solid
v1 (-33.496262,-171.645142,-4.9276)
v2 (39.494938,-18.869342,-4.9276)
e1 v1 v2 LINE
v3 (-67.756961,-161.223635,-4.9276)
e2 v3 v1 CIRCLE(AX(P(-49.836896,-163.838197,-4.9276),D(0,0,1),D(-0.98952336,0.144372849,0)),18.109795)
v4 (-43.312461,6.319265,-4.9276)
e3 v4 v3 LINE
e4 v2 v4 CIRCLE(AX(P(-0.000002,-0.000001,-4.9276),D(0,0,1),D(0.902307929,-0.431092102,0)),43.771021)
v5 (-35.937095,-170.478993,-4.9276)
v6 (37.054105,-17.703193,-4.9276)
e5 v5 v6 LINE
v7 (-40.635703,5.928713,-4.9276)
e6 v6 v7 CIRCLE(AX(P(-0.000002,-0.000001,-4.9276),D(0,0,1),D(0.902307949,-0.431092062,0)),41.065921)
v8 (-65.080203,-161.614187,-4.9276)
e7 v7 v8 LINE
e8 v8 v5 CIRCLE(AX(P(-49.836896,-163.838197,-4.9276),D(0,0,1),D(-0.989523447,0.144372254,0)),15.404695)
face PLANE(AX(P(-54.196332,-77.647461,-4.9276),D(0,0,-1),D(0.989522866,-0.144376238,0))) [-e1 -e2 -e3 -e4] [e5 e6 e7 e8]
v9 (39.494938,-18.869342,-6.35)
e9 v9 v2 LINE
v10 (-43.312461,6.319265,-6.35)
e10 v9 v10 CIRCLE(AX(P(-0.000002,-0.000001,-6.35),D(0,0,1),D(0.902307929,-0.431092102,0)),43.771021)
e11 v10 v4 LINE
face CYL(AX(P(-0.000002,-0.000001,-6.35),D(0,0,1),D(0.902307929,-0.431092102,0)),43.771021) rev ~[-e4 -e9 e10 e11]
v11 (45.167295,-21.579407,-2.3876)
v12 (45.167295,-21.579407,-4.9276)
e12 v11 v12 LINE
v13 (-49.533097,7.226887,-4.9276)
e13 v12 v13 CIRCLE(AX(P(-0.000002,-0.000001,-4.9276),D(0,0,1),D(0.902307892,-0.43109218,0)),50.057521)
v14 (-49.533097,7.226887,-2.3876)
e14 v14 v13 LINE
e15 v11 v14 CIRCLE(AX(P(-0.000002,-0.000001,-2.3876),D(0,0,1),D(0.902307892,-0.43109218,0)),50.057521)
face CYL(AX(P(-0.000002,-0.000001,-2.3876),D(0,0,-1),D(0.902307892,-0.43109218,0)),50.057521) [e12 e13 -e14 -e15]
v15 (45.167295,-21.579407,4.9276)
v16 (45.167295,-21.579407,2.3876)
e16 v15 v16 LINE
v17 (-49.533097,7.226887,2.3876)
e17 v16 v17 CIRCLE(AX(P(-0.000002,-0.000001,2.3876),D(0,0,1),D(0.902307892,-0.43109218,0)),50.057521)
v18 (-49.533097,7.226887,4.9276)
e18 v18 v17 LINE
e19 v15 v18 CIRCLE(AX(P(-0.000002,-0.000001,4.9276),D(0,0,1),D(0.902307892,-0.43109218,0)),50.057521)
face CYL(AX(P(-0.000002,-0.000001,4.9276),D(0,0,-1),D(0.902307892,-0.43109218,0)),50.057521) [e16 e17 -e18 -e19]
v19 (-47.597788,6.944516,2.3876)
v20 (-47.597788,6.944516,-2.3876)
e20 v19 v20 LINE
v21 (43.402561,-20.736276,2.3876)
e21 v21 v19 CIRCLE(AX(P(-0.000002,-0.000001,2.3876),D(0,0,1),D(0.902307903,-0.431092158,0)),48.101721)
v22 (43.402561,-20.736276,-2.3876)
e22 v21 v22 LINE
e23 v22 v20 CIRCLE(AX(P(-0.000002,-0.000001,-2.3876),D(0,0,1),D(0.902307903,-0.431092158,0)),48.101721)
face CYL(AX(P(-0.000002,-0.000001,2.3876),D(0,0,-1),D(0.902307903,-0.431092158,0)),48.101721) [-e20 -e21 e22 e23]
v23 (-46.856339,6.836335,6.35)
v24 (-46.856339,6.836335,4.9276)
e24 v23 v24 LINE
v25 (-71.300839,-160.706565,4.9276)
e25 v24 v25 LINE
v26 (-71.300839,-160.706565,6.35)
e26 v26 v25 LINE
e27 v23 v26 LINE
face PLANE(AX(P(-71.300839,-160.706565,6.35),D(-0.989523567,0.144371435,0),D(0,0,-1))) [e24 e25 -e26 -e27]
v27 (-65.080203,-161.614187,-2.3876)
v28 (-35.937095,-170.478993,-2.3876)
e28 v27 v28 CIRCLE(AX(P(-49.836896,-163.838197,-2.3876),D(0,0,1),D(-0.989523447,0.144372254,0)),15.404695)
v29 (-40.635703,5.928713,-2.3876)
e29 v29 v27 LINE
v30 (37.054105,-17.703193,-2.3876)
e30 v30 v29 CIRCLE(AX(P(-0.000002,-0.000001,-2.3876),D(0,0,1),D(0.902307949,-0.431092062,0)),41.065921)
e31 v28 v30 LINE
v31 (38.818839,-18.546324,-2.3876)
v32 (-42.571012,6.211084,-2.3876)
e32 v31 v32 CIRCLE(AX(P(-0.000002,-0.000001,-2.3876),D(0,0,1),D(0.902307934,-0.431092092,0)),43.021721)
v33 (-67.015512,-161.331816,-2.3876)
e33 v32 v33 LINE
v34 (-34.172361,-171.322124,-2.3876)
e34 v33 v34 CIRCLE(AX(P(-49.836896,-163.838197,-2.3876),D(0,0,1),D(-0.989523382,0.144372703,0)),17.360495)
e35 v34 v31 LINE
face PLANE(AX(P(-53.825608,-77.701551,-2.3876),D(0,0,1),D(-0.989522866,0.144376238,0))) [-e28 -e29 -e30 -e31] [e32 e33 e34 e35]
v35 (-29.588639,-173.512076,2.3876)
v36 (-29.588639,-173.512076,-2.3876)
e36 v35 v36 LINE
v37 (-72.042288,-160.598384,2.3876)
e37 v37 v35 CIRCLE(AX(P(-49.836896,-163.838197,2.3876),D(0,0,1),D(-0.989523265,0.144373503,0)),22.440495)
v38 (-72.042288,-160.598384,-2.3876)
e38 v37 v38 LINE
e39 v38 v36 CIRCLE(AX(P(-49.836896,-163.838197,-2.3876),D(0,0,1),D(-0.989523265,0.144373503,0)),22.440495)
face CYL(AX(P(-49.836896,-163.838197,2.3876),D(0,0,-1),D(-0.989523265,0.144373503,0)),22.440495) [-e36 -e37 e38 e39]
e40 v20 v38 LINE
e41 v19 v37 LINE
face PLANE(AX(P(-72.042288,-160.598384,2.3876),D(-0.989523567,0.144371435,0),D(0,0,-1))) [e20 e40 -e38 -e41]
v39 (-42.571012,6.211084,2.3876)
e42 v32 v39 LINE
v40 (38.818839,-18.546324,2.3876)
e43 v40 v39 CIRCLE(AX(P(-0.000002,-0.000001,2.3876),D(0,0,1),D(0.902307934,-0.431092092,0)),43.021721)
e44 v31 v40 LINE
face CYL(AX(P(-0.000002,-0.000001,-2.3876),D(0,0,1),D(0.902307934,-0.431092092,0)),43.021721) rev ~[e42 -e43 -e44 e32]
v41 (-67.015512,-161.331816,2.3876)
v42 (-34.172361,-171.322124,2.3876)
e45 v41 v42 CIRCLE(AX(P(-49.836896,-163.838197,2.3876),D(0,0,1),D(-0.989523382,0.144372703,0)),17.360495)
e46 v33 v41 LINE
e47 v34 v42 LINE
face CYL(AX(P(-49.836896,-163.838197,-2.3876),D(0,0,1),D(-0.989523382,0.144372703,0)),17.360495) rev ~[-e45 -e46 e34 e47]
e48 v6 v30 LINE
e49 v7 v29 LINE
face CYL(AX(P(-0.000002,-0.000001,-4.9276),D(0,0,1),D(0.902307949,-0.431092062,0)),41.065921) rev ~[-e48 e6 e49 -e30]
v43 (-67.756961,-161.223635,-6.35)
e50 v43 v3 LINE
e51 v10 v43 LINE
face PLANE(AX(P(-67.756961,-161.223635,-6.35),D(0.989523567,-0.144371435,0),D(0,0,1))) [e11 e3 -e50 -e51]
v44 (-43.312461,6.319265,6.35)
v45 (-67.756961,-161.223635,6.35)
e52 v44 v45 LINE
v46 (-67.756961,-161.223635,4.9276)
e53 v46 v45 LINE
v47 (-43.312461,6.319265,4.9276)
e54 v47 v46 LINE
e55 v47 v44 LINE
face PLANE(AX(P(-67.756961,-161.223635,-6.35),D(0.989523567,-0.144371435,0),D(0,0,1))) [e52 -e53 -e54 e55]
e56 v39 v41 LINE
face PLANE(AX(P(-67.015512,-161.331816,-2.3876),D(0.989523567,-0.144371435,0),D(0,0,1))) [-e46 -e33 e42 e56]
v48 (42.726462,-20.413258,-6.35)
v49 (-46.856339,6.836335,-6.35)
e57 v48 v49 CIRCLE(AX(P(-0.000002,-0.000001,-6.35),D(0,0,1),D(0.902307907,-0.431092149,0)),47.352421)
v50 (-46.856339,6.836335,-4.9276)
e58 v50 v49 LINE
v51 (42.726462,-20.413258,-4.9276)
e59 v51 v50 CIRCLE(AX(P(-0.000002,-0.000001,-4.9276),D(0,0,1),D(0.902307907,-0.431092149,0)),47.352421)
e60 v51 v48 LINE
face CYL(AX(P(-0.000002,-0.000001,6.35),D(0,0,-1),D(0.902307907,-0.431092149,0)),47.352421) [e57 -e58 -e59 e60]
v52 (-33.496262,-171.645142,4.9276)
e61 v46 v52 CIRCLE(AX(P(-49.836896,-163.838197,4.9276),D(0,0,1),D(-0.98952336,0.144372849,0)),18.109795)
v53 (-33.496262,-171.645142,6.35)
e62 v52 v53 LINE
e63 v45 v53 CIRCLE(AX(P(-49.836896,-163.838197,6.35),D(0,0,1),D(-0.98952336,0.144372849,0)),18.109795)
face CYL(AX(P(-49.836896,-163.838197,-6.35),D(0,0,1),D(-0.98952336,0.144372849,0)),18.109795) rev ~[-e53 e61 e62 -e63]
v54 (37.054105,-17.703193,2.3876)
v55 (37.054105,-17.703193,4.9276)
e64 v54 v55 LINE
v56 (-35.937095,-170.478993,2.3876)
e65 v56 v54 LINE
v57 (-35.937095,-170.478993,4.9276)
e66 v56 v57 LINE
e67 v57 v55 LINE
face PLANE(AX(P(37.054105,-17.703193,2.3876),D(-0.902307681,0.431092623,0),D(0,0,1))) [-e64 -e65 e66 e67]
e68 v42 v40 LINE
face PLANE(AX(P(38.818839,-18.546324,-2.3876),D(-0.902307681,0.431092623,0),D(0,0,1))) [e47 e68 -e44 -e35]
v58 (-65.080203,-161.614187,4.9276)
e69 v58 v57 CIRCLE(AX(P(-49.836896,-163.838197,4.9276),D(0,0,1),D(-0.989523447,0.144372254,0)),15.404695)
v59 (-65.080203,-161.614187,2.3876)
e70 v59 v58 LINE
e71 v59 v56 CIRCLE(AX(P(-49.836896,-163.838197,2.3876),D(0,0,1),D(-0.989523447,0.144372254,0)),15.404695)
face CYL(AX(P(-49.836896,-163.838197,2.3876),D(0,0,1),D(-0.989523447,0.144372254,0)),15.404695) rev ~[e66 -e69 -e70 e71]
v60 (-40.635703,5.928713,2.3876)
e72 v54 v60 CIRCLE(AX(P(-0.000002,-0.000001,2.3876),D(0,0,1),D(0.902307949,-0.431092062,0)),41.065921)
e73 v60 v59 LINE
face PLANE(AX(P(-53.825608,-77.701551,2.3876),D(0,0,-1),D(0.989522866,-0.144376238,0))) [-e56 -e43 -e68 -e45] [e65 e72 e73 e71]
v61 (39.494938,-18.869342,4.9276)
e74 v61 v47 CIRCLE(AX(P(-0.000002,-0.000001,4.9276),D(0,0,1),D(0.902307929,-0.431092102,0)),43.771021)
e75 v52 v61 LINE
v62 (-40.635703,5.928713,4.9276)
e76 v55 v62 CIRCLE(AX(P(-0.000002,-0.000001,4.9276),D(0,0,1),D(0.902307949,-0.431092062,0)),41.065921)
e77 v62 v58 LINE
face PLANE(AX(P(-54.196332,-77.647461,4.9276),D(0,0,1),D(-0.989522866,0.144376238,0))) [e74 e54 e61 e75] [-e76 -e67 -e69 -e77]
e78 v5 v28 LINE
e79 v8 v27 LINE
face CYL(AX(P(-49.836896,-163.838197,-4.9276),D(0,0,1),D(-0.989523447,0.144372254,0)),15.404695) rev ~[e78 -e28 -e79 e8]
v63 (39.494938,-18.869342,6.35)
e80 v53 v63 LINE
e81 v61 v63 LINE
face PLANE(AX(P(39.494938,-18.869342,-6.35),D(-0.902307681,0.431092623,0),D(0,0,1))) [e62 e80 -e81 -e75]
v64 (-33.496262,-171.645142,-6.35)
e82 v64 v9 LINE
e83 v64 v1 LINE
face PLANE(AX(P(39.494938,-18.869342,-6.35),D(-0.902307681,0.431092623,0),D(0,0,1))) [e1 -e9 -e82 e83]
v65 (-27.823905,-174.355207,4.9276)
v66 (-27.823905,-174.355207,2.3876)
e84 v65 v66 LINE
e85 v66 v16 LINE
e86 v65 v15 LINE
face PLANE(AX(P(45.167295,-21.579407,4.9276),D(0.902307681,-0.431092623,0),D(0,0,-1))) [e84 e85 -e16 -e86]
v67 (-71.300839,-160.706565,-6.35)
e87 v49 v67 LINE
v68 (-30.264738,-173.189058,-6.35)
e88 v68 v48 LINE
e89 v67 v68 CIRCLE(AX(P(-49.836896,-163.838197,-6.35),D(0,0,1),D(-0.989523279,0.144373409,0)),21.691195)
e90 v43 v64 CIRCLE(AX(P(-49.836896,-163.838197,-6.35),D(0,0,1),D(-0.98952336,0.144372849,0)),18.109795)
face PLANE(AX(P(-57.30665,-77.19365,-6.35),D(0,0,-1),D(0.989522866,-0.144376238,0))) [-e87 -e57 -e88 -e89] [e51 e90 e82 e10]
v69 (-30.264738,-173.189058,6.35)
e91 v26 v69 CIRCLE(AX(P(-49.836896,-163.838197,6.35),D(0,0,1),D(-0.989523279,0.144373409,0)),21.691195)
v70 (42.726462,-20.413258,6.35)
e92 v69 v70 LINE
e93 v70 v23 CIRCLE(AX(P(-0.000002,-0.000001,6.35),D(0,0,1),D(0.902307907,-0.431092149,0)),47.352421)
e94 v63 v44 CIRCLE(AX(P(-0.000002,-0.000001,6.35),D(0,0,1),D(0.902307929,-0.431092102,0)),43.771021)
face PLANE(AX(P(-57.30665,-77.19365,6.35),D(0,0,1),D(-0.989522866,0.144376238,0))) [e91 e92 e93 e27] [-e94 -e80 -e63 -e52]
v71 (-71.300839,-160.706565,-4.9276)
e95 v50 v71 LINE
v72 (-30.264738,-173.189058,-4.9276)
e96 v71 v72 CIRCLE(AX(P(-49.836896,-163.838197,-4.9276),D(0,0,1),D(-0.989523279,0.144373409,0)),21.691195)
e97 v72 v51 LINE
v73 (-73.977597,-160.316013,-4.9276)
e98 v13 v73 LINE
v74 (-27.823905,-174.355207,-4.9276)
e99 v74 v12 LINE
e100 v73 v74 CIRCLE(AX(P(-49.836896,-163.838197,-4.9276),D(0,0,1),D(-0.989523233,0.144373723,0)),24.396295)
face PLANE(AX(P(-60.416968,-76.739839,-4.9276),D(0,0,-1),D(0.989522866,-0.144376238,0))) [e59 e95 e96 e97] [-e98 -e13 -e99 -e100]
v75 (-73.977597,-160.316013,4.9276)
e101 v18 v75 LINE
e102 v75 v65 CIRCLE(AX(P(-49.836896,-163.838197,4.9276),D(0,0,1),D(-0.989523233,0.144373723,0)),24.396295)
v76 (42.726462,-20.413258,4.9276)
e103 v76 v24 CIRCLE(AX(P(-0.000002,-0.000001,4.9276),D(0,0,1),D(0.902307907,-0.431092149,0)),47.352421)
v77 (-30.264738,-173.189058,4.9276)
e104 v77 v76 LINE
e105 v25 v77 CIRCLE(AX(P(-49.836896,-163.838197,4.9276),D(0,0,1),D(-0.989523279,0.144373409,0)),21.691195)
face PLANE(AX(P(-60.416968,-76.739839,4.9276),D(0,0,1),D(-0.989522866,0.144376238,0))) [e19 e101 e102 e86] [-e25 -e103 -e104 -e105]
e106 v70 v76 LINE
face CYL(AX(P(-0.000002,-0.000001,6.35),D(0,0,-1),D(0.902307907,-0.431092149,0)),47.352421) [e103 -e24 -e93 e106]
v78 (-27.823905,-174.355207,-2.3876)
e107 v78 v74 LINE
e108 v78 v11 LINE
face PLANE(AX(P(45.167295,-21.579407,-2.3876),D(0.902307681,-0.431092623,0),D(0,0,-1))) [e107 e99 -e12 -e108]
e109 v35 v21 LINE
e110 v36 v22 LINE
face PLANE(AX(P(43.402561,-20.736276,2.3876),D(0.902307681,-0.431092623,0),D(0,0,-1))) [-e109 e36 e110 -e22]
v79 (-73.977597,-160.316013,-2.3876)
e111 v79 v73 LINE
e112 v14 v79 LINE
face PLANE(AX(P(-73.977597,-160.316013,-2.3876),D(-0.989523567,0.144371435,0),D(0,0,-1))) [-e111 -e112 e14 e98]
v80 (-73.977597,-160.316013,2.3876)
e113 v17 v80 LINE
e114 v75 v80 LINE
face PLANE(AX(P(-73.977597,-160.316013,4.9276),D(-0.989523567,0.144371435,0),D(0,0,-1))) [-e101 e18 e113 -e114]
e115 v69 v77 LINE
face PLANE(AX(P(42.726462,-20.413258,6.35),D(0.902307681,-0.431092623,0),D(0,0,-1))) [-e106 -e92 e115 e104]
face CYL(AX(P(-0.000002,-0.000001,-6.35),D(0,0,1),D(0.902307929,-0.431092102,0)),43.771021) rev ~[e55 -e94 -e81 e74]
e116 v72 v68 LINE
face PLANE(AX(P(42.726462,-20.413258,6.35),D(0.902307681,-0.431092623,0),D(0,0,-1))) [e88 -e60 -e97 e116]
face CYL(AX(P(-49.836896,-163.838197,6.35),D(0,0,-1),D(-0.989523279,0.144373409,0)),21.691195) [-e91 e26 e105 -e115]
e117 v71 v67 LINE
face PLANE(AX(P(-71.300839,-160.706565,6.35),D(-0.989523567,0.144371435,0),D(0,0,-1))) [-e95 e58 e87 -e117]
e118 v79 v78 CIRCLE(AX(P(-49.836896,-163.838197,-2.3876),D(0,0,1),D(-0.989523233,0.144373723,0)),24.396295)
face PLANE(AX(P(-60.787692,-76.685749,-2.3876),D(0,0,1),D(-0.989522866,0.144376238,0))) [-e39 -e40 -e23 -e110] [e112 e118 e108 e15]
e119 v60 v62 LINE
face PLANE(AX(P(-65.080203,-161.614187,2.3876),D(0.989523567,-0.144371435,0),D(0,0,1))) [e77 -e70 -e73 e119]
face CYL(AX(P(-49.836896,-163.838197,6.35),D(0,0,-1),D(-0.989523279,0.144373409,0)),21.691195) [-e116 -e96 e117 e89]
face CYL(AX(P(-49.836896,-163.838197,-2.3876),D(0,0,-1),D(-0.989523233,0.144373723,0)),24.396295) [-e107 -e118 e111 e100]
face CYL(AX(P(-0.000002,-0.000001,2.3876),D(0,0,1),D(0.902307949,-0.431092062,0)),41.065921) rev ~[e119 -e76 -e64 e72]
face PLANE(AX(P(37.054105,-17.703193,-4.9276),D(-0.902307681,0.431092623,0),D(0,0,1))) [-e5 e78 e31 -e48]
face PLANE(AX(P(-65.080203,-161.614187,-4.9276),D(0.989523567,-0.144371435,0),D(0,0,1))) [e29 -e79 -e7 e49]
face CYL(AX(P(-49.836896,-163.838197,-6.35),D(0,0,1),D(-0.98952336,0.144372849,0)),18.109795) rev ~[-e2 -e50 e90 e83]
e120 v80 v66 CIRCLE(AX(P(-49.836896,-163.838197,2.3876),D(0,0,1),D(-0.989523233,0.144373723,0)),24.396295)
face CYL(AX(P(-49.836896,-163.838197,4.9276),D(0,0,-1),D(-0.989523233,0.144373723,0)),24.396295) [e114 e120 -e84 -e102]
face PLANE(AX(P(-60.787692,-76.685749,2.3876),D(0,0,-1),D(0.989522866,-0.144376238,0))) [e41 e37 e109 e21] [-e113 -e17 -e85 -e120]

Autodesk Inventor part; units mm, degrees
ref_plane "Work Plane2" through (-49.8369, -163.8382, 0) normal (-1, 0, 0) x (0, 0, 1)
ref_plane "Work Plane3" through (0, 0, 0) normal (-0.1802136, -0.9836275, 0) x (0, 0, 1)
sketch "Path" plane through (0, 0, 0) normal (0, 0, 1) x (1, 0, 0)
  arc A0 (-69.5289, -160.9651) -> (-31.8805, -172.4171) centre (-49.8369, -163.8382) ccw
  arc A1 (41.1107, -19.6413) -> (-45.0844, 6.5778) centre (0, 0) ccw
  line L0 (41.1107, -19.6413) -> (-31.8805, -172.4171)
  line L1 (-69.5289, -160.9651) -> (-45.0844, 6.5778)
  dimension "d31" = 8.9916
ref_plane "Section Plane" through (-31.8805, -172.4171, 0) normal (0.4310927, 0.9023076, 0) x (0, 0, 1)
sketch "Section Sketch" plane through (-31.8805, -172.4171, 0) normal (0.4310927, 0.9023076, 0) x (0, 0, 1)
  line L0 (-6.35, -1.7907) -> (6.35, -1.7907)
  line L1 (6.35, -1.7907) -> (6.35, 1.7907)
  line L2 (6.35, 1.7907) -> (-6.35, 1.7907)
  line L3 (-6.35, 1.7907) -> (-6.35, -1.7907)
  line L4 (-2.3876, -2.54) -> (2.3876, -2.54)
  line L5 (2.3876, -2.54) -> (2.3876, 2.54)
  line L6 (2.3876, 2.54) -> (-2.3876, 2.54)
  line L7 (-2.3876, 2.54) -> (-2.3876, -2.54)
  line L8 (-2.3876, 0) -> (2.3876, 0) construction
  line L9 (-4.9276, -4.4958) -> (-2.3876, -4.4958)
  line L10 (-2.3876, -4.4958) -> (-2.3876, 4.4958)
  line L11 (-2.3876, 4.4958) -> (-4.9276, 4.4958)
  line L12 (-4.9276, 4.4958) -> (-4.9276, -4.4958)
  line L13 (2.3876, -4.4958) -> (4.9276, -4.4958)
  line L14 (4.9276, -4.4958) -> (4.9276, 4.4958)
  line L15 (4.9276, 4.4958) -> (2.3876, 4.4958)
  line L16 (2.3876, 4.4958) -> (2.3876, -4.4958)
  line L17 (-6.35, 0) -> (6.35, 0) construction
  point P0 (0, 0)
  point P1 (0, 0)
  dimension "d21" = 3.5814
  dimension "d22" = 5.08
  dimension "d23" = 4.7752
  dimension "d24" = 2.54
  dimension "d31" = 8.9916
  dimension "d32" = 12.7
sweep "Solid" add profiles "Section Sketch" path "Path"
pattern_of_one "Strand Pattern"
equation "\"d21\" = da_d2"
equation "\"d22\" = da_d1"
equation "\"d23\" = da_b1"
equation "\"d24\" = da_t1 + da_t2"
equation "\"d30\" = da_pt"
equation "\"da_p\" = 9.525"
equation "\"da_b1\" = 4.7752"
equation "\"da_h2\" = 8.9916"
equation "\"da_h3\" = 7.7978"
equation "\"da_d1\" = 5.08"
equation "\"da_d2\" = 3.5814"
equation "\"da_pt\" = 10.1346"
equation "\"da_b\" = 12.7"
equation "\"da_t1\" = 1.27"
equation "\"da_t2\" = 1.27"
properties part number "Roller Chain"
